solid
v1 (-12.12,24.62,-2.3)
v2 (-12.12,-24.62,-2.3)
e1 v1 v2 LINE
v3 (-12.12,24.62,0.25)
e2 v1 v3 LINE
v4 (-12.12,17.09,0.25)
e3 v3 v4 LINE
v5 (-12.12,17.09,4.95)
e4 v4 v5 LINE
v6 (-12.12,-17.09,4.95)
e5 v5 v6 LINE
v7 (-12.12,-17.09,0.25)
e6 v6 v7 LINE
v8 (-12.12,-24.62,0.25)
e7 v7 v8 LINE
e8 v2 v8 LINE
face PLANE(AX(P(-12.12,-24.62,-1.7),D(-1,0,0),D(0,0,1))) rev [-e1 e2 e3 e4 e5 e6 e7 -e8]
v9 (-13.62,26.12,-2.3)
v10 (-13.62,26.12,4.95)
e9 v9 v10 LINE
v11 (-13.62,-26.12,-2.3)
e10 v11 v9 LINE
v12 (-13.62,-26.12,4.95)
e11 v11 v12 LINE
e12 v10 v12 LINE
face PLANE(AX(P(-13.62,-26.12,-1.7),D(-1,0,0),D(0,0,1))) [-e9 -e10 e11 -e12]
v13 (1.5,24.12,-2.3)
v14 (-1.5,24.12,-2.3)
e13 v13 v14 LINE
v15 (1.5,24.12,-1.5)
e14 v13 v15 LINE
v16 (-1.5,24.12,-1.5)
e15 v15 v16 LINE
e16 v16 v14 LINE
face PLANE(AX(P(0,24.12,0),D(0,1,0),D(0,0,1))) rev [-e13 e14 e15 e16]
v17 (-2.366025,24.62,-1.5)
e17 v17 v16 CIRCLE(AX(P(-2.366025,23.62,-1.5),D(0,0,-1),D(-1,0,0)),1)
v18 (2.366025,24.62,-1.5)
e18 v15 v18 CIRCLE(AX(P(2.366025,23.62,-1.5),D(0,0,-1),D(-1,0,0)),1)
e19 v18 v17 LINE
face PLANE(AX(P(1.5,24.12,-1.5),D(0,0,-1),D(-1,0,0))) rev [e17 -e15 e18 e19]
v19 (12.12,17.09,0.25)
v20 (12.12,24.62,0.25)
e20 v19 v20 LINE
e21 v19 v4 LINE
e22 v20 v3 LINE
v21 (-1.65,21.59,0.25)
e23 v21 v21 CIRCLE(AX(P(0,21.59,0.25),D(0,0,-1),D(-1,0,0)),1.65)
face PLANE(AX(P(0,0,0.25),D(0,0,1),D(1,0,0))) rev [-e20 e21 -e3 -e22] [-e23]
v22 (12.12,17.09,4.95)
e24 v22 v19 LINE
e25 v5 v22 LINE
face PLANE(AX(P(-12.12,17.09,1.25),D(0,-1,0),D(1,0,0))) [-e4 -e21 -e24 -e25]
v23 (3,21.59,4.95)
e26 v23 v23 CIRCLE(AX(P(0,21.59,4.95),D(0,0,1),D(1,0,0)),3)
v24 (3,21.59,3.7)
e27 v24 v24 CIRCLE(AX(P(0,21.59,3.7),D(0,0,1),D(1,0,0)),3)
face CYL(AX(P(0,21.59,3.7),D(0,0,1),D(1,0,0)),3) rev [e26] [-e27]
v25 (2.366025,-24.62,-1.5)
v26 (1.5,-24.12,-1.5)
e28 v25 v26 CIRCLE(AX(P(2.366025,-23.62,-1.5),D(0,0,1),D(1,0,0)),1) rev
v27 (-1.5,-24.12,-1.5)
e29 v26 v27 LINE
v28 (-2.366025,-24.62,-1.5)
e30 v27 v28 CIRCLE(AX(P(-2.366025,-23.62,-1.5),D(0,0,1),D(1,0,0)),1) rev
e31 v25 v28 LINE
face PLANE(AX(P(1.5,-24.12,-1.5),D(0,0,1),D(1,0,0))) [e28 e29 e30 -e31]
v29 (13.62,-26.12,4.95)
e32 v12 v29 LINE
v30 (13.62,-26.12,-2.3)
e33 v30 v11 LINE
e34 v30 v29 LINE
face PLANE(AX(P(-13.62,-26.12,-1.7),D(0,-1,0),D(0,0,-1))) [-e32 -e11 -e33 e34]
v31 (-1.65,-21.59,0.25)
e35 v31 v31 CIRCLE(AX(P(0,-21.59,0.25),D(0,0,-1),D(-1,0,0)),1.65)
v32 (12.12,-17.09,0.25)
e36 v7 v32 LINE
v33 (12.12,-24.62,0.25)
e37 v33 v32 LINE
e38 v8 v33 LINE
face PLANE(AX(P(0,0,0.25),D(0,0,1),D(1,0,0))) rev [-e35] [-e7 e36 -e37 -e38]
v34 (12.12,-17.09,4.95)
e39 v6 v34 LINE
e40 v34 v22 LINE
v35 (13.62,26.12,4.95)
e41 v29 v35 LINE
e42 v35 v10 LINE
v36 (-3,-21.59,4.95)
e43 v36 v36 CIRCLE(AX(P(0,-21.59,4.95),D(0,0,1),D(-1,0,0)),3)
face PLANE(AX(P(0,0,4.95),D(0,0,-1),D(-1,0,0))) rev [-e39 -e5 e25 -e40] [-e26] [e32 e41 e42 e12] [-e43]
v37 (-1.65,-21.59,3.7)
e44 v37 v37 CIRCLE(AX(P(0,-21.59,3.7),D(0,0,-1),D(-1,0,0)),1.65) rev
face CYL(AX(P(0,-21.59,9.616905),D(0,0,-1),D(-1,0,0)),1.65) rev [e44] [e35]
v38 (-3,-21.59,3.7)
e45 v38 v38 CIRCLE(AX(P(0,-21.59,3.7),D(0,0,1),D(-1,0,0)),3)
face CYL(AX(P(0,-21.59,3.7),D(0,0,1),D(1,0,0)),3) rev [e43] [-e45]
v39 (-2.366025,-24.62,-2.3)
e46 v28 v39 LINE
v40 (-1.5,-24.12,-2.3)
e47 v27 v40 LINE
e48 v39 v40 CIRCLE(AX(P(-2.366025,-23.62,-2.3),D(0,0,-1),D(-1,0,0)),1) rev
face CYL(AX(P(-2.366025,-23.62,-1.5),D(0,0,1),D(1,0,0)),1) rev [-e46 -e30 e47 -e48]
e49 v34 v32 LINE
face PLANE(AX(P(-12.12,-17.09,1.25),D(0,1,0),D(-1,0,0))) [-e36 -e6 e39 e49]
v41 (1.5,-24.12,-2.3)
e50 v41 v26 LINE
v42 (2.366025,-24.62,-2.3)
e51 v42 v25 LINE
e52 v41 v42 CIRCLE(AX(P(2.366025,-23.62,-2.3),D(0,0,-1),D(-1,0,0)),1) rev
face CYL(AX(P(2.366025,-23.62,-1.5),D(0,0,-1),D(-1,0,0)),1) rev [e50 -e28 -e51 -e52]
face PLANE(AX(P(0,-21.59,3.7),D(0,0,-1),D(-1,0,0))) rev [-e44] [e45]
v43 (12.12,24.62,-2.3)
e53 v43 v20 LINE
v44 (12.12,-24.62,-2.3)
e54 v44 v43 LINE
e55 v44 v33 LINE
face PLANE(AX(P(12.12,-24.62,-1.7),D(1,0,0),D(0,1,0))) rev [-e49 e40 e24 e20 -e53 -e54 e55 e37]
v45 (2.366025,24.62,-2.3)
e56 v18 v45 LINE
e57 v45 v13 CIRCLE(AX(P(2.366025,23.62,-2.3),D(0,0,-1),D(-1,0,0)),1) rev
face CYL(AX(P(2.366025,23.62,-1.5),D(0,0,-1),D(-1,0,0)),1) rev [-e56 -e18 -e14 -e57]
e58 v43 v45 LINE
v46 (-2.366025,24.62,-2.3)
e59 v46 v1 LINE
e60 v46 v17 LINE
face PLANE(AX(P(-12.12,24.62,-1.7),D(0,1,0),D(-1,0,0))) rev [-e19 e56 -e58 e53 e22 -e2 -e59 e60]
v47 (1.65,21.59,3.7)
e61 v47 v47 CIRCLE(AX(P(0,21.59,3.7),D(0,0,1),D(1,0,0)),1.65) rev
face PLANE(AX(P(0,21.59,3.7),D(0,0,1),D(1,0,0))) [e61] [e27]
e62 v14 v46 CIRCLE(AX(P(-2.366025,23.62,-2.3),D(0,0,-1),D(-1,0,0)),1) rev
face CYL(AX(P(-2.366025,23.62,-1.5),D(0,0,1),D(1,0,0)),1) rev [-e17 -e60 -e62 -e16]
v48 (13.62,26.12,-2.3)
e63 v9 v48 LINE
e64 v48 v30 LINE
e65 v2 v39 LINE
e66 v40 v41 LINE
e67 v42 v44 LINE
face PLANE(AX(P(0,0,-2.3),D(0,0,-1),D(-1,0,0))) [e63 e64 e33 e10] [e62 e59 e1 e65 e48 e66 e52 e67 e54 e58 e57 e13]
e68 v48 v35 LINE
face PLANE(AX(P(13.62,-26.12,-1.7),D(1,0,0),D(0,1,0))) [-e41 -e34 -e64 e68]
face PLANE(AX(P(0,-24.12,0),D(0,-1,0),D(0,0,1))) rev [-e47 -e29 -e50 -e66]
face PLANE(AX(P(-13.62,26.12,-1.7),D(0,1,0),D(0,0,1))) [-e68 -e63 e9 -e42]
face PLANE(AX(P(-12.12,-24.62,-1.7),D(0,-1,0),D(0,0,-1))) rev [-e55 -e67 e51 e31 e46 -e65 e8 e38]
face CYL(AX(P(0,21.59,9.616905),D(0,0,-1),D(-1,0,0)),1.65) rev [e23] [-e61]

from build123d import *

# Parameters (mm, degrees)
BOSS_EXTRUDE1_DEPTH      = 0.25
BOSS_EXTRUDE1_DEPTH_BACK = 1.7
SKETCH1_W                = 27.24
SKETCH1_H                = 52.24
SKETCH1_W_2              = 24.24
SKETCH1_H_2              = 49.24
SKETCH2_W                = 27.24
SKETCH2_H                = 52.24
SKETCH2_W_2              = 24.24
SKETCH2_H_2              = 34.18
BOSS_EXTRUDE2_DEPTH      = 1
SKETCH3_W                = 3
SKETCH3_H                = 34.18
BOSS_EXTRUDE3_DEPTH      = 1
SKETCH4_W                = 6
SKETCH4_H                = 34.18
CUT_EXTRUDE1_DEPTH       = 2.95
SKETCH5_W                = 3
SKETCH5_H                = 0.2
BOSS_EXTRUDE4_DEPTH      = 0.5
BOSS_EXTRUDE5_DEPTH      = 0.6
FILLET1_R                = 1
SKETCH8_W                = 16.74
SKETCH8_H                = 34.18
BOSS_EXTRUDE6_DEPTH      = 3.7
SKETCH7_R                = 1.65
CUT_EXTRUDE2_DEPTH       = 4.7
SKETCH10_R               = 3
CUT_EXTRUDE3_DEPTH       = 1.25
SKETCH12_W               = 6.25
SKETCH12_H               = 34.18
SKETCH12_W_2             = 7.24
BOSS_EXTRUDE7_DEPTH      = 4.7
SKETCH18_W               = 7.24
SKETCH18_H               = 34.18
CUT_EXTRUDE6_DEPTH       = 4.7
SKETCH19_W               = 1.5
SKETCH19_H               = 7.25
BOSS_EXTRUDE8_DEPTH      = 34.18
SKETCH20_W               = 6.25
SKETCH20_H               = 34.18
CUT_EXTRUDE7_DEPTH       = 4.7


with BuildPart() as part:
    # Sketch1 → Boss-Extrude1 (new, two sides: drawn at the far end of the back side and taken through both)
    with BuildSketch(Plane.XY.offset(-BOSS_EXTRUDE1_DEPTH_BACK)):
        Rectangle(SKETCH1_W, SKETCH1_H)
        Rectangle(SKETCH1_W_2, SKETCH1_H_2, mode=Mode.SUBTRACT)
    extrude(amount=BOSS_EXTRUDE1_DEPTH + BOSS_EXTRUDE1_DEPTH_BACK)

    # Sketch2 → Boss-Extrude2 (add)
    with BuildSketch(Plane.XY.offset(0.25)):
        Rectangle(SKETCH2_W, SKETCH2_H)
        Rectangle(SKETCH2_W_2, SKETCH2_H_2, mode=Mode.SUBTRACT)
    extrude(amount=BOSS_EXTRUDE2_DEPTH)

    # Sketch3 → Boss-Extrude3 (add)
    with BuildSketch(Plane.XY.offset(1.25)):
        with Locations((-6.12, 0)):
            Rectangle(SKETCH3_W, SKETCH3_H)
    extrude(amount=-BOSS_EXTRUDE3_DEPTH)

    # Sketch4 → Cut-Extrude1 (cut)
    with BuildSketch(Plane.XY.offset(1.25)):
        with Locations((-10.62, 0)):
            Rectangle(SKETCH4_W, SKETCH4_H)
    extrude(amount=-CUT_EXTRUDE1_DEPTH, mode=Mode.SUBTRACT)

    # Sketch5 → Boss-Extrude4 (add)
    with BuildSketch(Plane.XZ.offset(-24.62)):
        with Locations((0, -1.6)):
            Rectangle(SKETCH5_W, SKETCH5_H)
    boss_extrude4 = extrude(amount=BOSS_EXTRUDE4_DEPTH)

    # Mirror1: Boss-Extrude4 across plane
    add(boss_extrude4.mirror(Plane.ZX))

    # Sketch6 → Boss-Extrude5 (add)
    with BuildSketch(Plane(origin=(0, 0, -1.7), x_dir=(-1, 0, 0), z_dir=(0, 0, -1))):
        Polygon((13.62, -26.12), (13.62, -17.09), (12.12, -17.09), (12.12, -24.62), (1.5, -24.62), (1.5, -24.12), (-1.5, -24.12), (-1.5, -24.62), (-12.12, -24.62), (-12.12, 24.62), (-1.5, 24.62), (-1.5, 24.12), (1.5, 24.12), (1.5, 24.62), (12.12, 24.62), (12.12, 17.09), (13.62, 17.09), (13.62, 26.12), (-13.62, 26.12), (-13.62, -26.12), align=None)
    extrude(amount=BOSS_EXTRUDE5_DEPTH)

    # Fillet1
    # the kernel refuses this fillet: 1 mm, written as the material it adds along each edge
    with BuildSketch(Plane(origin=(1.5, -24.62, -2.3), x_dir=(1, 0, 0), z_dir=(0, 0, 1)), Plane(origin=(-1.5, -24.62, -1.5), x_dir=(-1, 0, 0), z_dir=(0, 0, -1)), Plane(origin=(1.5, 24.62, -1.5), x_dir=(1, 0, 0), z_dir=(0, 0, -1)), Plane(origin=(-1.5, 24.62, -2.3), x_dir=(-1, 0, 0), z_dir=(0, 0, 1))) as fillet1_piece_1:
        with BuildLine():
            CenterArc((0.866025404, 1), FILLET1_R, 210, 60)
            Line((0, 0.5), (-0.017320508, 0.49))
            ThreePointArc((-0.017320508, 0.49), (-0.02, 0.25), (-0.02, 0))
            Line((-0.02, 0), (0, -0.02))
            Line((0, -0.02), (0.866025404, -0.02))
            Line((0.866025404, -0.02), (0.866025404, 0))
        make_face()
    extrude(amount=0.8)

    # Sketch8 → Boss-Extrude6 (add)
    with BuildSketch(Plane.XY.offset(1.25)):
        Polygon((-7.62, -17.09), (-13.62, -17.09), (-13.62, -26.12), (13.62, -26.12), (13.62, 26.12), (-13.62, 26.12), (-13.62, 17.09), (-7.62, 17.09), align=None)
        with Locations((3.75, 0)):
            Rectangle(SKETCH8_W, SKETCH8_H, mode=Mode.SUBTRACT)
    extrude(amount=BOSS_EXTRUDE6_DEPTH)

    # Sketch7 → Cut-Extrude2 (cut)
    with BuildSketch(Plane(origin=(0, 0, 0.25), x_dir=(-1, 0, 0), z_dir=(0, 0, -1))):
        with Locations((0, 21.59)):
            Circle(SKETCH7_R)
        with Locations((0, -21.59)):
            Circle(SKETCH7_R)
    extrude(amount=-CUT_EXTRUDE2_DEPTH, mode=Mode.SUBTRACT)

    # Sketch10 → Cut-Extrude3 (cut)
    with BuildSketch(Plane.XY.offset(4.95)):
        with Locations((0, 21.59)):
            Circle(SKETCH10_R)
        with Locations(Location((0, -21.59, 0), (0, 0, 180))):
            Circle(SKETCH10_R)
    extrude(amount=-CUT_EXTRUDE3_DEPTH, mode=Mode.SUBTRACT)

    # Sketch12 → Boss-Extrude7 (add)
    with BuildSketch(Plane(origin=(0, 0, 0.25), x_dir=(-1, 0, 0), z_dir=(0, 0, -1))):
        with Locations((-8.995, 0)):
            Rectangle(SKETCH12_W, SKETCH12_H)
        with Locations((6.25, 0)):
            Rectangle(SKETCH12_W_2, SKETCH12_H)
    extrude(amount=-BOSS_EXTRUDE7_DEPTH)

    # Sketch18 → Cut-Extrude6 (cut)
    with BuildSketch(Plane(origin=(0, 0, 0.25), x_dir=(-1, 0, 0), z_dir=(0, 0, -1))):
        with Locations((6.25, 0)):
            Rectangle(SKETCH18_W, SKETCH18_H)
    extrude(amount=-CUT_EXTRUDE6_DEPTH, mode=Mode.SUBTRACT)

    # Sketch19 → Boss-Extrude8 (add)
    with BuildSketch(Plane(origin=(0, -17.09, 0), x_dir=(1, 0, 0), z_dir=(0, 1, 0))):
        with Locations((-12.87, -1.325)):
            Rectangle(SKETCH19_W, SKETCH19_H)
    extrude(amount=BOSS_EXTRUDE8_DEPTH)

    # Sketch20 → Cut-Extrude7 (cut)
    with BuildSketch(Plane(origin=(0, 0, 0.25), x_dir=(-1, 0, 0), z_dir=(0, 0, -1))):
        with Locations((-8.995, 0)):
            Rectangle(SKETCH20_W, SKETCH20_H)
    extrude(amount=-CUT_EXTRUDE7_DEPTH, mode=Mode.SUBTRACT)


solid = part.part
